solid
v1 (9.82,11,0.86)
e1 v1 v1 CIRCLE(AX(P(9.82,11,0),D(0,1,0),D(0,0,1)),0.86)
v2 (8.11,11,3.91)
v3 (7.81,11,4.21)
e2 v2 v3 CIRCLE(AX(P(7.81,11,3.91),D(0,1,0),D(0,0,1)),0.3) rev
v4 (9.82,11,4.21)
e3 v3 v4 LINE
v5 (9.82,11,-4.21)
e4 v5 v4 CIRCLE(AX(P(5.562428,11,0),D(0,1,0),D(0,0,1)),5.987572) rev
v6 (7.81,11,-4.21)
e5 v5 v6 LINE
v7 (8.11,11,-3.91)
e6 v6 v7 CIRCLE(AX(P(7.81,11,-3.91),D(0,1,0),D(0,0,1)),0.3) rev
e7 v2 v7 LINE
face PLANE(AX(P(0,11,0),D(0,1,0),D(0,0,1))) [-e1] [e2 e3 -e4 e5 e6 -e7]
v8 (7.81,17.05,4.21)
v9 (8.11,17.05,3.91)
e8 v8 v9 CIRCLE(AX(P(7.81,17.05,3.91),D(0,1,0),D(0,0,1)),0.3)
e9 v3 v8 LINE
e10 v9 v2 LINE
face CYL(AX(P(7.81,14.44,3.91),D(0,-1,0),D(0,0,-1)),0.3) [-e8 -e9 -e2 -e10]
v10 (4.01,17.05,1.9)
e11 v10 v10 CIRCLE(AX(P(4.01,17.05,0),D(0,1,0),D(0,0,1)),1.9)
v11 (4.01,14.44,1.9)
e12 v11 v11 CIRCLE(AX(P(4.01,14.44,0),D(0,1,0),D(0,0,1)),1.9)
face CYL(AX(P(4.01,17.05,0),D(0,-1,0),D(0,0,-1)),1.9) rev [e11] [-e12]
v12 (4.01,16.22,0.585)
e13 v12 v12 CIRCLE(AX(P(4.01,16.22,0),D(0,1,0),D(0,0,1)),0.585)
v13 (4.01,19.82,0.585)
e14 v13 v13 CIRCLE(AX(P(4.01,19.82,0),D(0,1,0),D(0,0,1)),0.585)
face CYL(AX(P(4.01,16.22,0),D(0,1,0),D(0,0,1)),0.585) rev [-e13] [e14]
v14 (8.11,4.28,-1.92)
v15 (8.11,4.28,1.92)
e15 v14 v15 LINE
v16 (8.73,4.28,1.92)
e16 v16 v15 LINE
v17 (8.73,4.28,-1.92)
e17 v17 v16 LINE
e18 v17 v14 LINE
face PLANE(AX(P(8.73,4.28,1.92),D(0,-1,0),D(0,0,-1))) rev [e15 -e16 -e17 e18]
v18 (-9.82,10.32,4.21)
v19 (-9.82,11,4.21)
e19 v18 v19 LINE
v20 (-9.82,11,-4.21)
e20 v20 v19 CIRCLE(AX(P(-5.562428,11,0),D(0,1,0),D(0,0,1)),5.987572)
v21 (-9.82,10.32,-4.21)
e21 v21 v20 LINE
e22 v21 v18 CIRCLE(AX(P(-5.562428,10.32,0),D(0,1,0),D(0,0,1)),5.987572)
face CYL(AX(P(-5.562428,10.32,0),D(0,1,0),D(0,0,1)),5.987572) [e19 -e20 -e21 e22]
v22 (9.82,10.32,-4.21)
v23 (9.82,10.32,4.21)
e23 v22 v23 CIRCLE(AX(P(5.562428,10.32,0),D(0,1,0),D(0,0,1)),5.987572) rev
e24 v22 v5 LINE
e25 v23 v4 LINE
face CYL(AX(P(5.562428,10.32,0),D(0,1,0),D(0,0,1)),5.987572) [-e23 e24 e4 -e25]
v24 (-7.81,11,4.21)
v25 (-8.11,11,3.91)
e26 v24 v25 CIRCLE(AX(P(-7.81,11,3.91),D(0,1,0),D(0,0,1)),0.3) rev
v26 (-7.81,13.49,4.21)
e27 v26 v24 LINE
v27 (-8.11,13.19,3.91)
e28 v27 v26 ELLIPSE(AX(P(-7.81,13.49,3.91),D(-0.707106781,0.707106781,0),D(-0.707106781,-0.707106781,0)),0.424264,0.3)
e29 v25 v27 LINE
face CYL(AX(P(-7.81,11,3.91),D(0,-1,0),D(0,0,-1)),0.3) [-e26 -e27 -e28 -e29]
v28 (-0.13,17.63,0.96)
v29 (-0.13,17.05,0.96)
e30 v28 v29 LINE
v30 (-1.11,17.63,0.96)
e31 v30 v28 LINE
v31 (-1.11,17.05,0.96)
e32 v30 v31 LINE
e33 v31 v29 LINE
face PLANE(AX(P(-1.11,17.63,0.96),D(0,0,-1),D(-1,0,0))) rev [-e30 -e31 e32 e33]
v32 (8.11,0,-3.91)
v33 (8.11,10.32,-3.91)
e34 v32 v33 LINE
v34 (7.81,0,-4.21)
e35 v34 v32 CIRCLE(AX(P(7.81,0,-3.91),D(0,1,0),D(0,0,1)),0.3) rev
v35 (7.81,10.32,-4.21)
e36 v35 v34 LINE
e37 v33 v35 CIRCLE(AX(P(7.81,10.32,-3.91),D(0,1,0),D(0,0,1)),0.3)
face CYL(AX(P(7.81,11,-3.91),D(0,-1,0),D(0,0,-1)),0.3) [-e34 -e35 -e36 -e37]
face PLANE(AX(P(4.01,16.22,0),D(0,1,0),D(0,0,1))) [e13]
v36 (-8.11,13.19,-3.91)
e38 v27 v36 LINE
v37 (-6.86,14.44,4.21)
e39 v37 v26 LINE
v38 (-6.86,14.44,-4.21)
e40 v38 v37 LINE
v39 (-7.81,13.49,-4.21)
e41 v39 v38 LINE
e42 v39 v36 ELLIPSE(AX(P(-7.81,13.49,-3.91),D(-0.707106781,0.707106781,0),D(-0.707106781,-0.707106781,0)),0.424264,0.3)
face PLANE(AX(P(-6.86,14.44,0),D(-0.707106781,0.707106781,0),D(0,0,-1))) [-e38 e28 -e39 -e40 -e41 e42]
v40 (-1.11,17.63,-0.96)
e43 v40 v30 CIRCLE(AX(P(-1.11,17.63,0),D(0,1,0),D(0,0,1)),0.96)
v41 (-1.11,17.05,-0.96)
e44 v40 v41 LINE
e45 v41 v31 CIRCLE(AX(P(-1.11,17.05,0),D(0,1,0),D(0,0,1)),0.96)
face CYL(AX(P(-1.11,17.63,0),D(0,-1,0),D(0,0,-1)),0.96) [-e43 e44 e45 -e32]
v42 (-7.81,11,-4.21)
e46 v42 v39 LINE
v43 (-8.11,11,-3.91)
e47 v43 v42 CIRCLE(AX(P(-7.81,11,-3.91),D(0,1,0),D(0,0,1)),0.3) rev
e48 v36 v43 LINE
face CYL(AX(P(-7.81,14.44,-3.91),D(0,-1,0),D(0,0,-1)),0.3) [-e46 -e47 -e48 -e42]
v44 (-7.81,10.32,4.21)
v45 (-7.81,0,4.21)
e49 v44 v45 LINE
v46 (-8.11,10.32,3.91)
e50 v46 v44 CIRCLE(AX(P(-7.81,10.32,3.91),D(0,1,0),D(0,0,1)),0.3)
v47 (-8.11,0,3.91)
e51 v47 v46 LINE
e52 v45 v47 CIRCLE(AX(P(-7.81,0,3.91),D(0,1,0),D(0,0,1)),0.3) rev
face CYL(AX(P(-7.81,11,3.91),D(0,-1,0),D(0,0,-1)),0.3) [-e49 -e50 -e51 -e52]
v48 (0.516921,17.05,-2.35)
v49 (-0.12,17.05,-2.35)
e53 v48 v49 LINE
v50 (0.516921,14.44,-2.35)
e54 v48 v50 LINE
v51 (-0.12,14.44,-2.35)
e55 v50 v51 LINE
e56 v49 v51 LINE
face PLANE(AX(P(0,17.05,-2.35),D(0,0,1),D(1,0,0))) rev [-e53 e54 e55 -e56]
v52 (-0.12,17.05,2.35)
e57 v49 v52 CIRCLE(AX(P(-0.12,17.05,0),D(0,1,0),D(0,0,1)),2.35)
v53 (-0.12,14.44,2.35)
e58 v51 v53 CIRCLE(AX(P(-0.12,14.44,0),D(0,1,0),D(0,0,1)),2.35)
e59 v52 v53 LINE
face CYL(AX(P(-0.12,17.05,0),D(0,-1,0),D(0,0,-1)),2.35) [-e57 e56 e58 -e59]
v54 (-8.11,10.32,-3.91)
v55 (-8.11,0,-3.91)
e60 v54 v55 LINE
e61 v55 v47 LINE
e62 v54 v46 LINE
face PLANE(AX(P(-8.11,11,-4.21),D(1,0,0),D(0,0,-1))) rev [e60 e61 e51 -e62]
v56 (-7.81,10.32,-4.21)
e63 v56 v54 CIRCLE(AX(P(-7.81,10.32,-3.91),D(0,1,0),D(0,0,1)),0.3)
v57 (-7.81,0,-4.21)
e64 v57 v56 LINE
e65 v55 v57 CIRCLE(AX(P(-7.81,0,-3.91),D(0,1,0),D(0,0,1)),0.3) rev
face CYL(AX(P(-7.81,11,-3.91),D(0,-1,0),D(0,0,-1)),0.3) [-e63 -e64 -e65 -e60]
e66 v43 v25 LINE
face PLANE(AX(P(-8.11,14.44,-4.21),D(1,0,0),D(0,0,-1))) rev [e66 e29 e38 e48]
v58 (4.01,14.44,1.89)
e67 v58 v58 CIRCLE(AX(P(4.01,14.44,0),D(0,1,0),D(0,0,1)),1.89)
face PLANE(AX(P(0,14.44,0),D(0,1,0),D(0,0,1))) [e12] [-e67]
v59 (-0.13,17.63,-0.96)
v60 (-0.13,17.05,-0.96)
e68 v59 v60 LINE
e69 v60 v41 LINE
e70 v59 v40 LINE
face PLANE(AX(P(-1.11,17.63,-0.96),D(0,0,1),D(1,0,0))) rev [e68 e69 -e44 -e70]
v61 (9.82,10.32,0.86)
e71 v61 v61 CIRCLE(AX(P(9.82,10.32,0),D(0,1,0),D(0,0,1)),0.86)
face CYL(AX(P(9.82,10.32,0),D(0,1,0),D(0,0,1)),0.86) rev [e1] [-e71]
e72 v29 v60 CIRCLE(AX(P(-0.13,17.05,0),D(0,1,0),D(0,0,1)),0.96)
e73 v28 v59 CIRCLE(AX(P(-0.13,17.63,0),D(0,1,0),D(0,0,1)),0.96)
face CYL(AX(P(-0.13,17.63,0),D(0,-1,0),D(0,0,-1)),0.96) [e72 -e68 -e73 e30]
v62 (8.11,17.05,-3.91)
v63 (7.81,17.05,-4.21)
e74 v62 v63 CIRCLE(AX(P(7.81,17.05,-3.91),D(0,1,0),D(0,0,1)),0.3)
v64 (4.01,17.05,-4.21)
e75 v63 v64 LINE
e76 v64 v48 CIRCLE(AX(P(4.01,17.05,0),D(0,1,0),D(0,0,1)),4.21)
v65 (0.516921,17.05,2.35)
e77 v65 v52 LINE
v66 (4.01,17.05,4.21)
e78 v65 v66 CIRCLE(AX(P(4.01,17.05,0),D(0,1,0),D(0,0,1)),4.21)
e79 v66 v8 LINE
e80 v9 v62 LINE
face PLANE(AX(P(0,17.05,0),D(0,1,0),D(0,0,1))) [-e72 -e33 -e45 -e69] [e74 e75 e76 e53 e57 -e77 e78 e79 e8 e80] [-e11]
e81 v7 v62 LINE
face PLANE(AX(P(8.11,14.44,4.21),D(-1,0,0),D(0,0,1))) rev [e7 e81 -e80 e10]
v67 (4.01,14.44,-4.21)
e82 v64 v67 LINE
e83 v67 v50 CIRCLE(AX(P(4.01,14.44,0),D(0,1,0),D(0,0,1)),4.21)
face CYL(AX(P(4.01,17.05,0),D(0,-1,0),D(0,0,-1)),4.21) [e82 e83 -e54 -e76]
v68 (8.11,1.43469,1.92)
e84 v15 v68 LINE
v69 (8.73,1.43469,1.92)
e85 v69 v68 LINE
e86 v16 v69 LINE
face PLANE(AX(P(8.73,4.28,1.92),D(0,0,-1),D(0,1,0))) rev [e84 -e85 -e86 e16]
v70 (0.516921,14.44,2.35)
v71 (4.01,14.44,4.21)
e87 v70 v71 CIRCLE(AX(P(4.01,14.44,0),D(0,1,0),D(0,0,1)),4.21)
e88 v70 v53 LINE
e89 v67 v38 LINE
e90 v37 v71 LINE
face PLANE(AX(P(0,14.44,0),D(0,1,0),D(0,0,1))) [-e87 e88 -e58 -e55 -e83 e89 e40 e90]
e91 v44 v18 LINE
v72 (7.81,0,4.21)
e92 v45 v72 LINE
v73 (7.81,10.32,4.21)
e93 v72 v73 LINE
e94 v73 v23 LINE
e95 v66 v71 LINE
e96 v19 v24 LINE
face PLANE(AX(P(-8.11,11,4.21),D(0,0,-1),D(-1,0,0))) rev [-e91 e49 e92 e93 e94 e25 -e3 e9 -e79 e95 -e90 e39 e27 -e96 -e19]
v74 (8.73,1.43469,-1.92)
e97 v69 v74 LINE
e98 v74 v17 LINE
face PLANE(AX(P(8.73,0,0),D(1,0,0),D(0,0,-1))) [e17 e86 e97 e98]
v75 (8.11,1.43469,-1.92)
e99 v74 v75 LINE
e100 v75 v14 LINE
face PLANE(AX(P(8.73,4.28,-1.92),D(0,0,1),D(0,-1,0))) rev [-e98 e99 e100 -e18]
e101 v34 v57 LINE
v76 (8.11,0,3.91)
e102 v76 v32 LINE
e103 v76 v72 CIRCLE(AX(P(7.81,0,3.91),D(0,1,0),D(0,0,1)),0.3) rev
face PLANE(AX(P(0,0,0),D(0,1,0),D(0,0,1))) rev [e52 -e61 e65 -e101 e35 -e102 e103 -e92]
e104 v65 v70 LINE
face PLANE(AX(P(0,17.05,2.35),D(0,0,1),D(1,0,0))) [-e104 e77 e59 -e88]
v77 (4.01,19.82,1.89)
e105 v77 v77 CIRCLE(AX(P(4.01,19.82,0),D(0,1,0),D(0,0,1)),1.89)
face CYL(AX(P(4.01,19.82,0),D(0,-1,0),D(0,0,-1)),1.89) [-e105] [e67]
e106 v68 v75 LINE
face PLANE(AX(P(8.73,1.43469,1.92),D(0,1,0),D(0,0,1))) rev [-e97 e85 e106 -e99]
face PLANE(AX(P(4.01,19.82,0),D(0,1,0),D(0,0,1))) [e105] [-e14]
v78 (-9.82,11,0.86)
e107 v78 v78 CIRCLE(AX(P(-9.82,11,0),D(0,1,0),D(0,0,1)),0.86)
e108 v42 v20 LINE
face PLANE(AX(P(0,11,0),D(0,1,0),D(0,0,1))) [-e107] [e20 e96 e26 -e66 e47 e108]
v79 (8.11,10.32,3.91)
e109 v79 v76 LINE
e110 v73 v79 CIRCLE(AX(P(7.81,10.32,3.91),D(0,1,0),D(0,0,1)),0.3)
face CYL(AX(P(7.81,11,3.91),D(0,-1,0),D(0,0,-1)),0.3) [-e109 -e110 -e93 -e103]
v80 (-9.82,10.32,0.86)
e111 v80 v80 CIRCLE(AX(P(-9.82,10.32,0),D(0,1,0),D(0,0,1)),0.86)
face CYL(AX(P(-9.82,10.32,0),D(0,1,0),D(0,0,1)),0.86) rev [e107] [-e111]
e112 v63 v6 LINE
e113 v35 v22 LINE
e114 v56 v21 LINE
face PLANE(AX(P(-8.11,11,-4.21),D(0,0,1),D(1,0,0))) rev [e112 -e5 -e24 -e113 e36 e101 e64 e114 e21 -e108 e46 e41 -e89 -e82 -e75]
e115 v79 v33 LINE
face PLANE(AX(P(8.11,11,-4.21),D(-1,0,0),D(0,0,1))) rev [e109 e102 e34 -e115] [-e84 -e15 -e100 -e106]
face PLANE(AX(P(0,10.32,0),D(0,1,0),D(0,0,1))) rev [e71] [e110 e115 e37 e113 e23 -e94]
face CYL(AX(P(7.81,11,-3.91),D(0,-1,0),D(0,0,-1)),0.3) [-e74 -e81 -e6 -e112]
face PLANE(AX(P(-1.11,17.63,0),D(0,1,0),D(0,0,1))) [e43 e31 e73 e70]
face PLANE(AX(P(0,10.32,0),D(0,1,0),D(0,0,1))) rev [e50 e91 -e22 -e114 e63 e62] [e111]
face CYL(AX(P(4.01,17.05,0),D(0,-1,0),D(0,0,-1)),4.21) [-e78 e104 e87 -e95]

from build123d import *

# Parameters (mm, degrees)
SKETCH_1_W          = 16.22
SKETCH_1_H          = 8.42
EXTRUDE_1_DEPTH     = 11
SKETCH_2_R          = 0.86
EXTRUDE_2_DEPTH     = 0.68
SKETCH_3_W          = 16.22
SKETCH_3_H          = 8.42
EXTRUDE_3_DEPTH     = 3.44
SKETCH_4_R          = 1.9
EXTRUDE_4_DEPTH     = 2.61
EXTRUDE_5_DEPTH     = 0.58
SKETCH_6_R          = 1.89
EXTRUDE_6_DEPTH     = 5.38
SKETCH_7_R          = 0.585
CUT_EXTRUDE_1_DEPTH = 3.6
CHAMFER_1_SIZE      = 1.25
FILLET_1_R          = 0.3
SKETCH_8_W          = 3.84
SKETCH_8_H          = 2.845310476
EXTRUDE_7_DEPTH     = 0.62


with BuildPart() as part:
    # 草图1 → 凸台-拉伸1 (new body)
    with BuildSketch(Plane(origin=(0, 0, 0), x_dir=(1, 0, 0), z_dir=(0, 1, 0))):
        Rectangle(SKETCH_1_W, SKETCH_1_H)
    extrude(amount=EXTRUDE_1_DEPTH)

    # 草图2 → 凸台-拉伸2 (add)
    # profile 1 of 2: a face of its own
    with BuildSketch(Plane(origin=(0, 11, 0), x_dir=(1, 0, 0), z_dir=(0, 1, 0))):
        with BuildLine():
            Line((-8.11, -4.21), (-8.11, 4.21))
            Line((-8.11, 4.21), (-9.82, 4.21))
            ThreePointArc((-9.82, 4.21), (-11.55, 0), (-9.82, -4.21))
            Line((-9.82, -4.21), (-8.11, -4.21))
        make_face()
        with Locations((-9.82, 0)):
            Circle(SKETCH_2_R, mode=Mode.SUBTRACT)
    # profile 2 of 2: a face of its own
    with BuildSketch(Plane(origin=(0, 11, 0), x_dir=(1, 0, 0), z_dir=(0, 1, 0))):
        with BuildLine():
            Line((9.82, 4.21), (8.11, 4.21))
            Line((8.11, 4.21), (8.11, -4.21))
            Line((8.11, -4.21), (9.82, -4.21))
            ThreePointArc((9.82, -4.21), (11.55, 0), (9.82, 4.21))
        make_face()
        with Locations((9.82, 0)):
            Circle(SKETCH_2_R, mode=Mode.SUBTRACT)
    extrude(amount=-EXTRUDE_2_DEPTH)

    # 草图3 → 凸台-拉伸3 (add)
    with BuildSketch(Plane(origin=(0, 11, 0), x_dir=(1, 0, 0), z_dir=(0, 1, 0))):
        Rectangle(SKETCH_3_W, SKETCH_3_H)
    extrude(amount=EXTRUDE_3_DEPTH)

    # 草图4 → 凸台-拉伸4 (add)
    with BuildSketch(Plane(origin=(0, 14.44, 0), x_dir=(1, 0, 0), z_dir=(0, 1, 0))):
        with BuildLine():
            Line((8.11, -4.21), (8.11, 4.21))
            Line((8.11, 4.21), (4.01, 4.21))
            ThreePointArc((4.01, 4.21), (2.031288298, 3.716019376), (0.516921129, 2.35))
            Line((0.516921129, 2.35), (-0.12, 2.35))
            ThreePointArc((-0.12, 2.35), (-2.47, 0), (-0.12, -2.35))
            Line((-0.12, -2.35), (0.516921129, -2.35))
            ThreePointArc((0.516921129, -2.35), (2.031288298, -3.716019376), (4.01, -4.21))
            Line((4.01, -4.21), (8.11, -4.21))
        make_face()
        with Locations((4.01, 0)):
            Circle(SKETCH_4_R, mode=Mode.SUBTRACT)
    extrude(amount=EXTRUDE_4_DEPTH)

    # 草图5 → 凸台-拉伸5 (add)
    with BuildSketch(Plane(origin=(0, 17.05, 0), x_dir=(1, 0, 0), z_dir=(0, 1, 0))):
        with BuildLine():
            Line((-1.11, 0.96), (-0.13, 0.96))
            ThreePointArc((-0.13, 0.96), (0.83, 0), (-0.13, -0.96))
            Line((-0.13, -0.96), (-1.11, -0.96))
            ThreePointArc((-1.11, -0.96), (-2.07, 0), (-1.11, 0.96))
        make_face()
    extrude(amount=EXTRUDE_5_DEPTH)

    # 草图6 → 凸台-拉伸6 (add)
    with BuildSketch(Plane(origin=(0, 14.44, 0), x_dir=(1, 0, 0), z_dir=(0, 1, 0))):
        with Locations((4.01, 0)):
            Circle(SKETCH_6_R)
    extrude(amount=EXTRUDE_6_DEPTH)

    # 草图7 → 切除-拉伸1 (cut)
    with BuildSketch(Plane(origin=(0, 19.82, 0), x_dir=(1, 0, 0), z_dir=(0, 1, 0))):
        with Locations((4.01, 0)):
            Circle(SKETCH_7_R)
    extrude(amount=-CUT_EXTRUDE_1_DEPTH, mode=Mode.SUBTRACT)

    # Chamfer 1
    chamfer_1_edges = [part.edges().sort_by_distance(p)[0] for p in [
        (-8.11, 14.44, 0),
    ]]
    chamfer(chamfer_1_edges, length=CHAMFER_1_SIZE)

    # Fillet 1
    fillet_1_edges = [part.edges().sort_by_distance(p)[0] for p in [
        (8.11, 5.16, -4.21),
        (8.11, 14.025, -4.21),
        (8.11, 14.025, 4.21),
        (8.11, 5.16, 4.21),
        (-8.11, 12.095, 4.21),
        (-8.11, 12.095, -4.21),
        (-8.11, 5.16, -4.21),
        (-8.11, 5.16, 4.21),
    ]]
    fillet(fillet_1_edges, radius=FILLET_1_R)

    # 草图8 → 凸台-拉伸7 (add)
    with BuildSketch(Plane(origin=(8.11, 0, 0), x_dir=(0, 0, -1), z_dir=(1, 0, 0))):
        with Locations((0, 2.857344762)):
            Rectangle(SKETCH_8_W, SKETCH_8_H)
    extrude(amount=EXTRUDE_7_DEPTH)


solid = part.part
